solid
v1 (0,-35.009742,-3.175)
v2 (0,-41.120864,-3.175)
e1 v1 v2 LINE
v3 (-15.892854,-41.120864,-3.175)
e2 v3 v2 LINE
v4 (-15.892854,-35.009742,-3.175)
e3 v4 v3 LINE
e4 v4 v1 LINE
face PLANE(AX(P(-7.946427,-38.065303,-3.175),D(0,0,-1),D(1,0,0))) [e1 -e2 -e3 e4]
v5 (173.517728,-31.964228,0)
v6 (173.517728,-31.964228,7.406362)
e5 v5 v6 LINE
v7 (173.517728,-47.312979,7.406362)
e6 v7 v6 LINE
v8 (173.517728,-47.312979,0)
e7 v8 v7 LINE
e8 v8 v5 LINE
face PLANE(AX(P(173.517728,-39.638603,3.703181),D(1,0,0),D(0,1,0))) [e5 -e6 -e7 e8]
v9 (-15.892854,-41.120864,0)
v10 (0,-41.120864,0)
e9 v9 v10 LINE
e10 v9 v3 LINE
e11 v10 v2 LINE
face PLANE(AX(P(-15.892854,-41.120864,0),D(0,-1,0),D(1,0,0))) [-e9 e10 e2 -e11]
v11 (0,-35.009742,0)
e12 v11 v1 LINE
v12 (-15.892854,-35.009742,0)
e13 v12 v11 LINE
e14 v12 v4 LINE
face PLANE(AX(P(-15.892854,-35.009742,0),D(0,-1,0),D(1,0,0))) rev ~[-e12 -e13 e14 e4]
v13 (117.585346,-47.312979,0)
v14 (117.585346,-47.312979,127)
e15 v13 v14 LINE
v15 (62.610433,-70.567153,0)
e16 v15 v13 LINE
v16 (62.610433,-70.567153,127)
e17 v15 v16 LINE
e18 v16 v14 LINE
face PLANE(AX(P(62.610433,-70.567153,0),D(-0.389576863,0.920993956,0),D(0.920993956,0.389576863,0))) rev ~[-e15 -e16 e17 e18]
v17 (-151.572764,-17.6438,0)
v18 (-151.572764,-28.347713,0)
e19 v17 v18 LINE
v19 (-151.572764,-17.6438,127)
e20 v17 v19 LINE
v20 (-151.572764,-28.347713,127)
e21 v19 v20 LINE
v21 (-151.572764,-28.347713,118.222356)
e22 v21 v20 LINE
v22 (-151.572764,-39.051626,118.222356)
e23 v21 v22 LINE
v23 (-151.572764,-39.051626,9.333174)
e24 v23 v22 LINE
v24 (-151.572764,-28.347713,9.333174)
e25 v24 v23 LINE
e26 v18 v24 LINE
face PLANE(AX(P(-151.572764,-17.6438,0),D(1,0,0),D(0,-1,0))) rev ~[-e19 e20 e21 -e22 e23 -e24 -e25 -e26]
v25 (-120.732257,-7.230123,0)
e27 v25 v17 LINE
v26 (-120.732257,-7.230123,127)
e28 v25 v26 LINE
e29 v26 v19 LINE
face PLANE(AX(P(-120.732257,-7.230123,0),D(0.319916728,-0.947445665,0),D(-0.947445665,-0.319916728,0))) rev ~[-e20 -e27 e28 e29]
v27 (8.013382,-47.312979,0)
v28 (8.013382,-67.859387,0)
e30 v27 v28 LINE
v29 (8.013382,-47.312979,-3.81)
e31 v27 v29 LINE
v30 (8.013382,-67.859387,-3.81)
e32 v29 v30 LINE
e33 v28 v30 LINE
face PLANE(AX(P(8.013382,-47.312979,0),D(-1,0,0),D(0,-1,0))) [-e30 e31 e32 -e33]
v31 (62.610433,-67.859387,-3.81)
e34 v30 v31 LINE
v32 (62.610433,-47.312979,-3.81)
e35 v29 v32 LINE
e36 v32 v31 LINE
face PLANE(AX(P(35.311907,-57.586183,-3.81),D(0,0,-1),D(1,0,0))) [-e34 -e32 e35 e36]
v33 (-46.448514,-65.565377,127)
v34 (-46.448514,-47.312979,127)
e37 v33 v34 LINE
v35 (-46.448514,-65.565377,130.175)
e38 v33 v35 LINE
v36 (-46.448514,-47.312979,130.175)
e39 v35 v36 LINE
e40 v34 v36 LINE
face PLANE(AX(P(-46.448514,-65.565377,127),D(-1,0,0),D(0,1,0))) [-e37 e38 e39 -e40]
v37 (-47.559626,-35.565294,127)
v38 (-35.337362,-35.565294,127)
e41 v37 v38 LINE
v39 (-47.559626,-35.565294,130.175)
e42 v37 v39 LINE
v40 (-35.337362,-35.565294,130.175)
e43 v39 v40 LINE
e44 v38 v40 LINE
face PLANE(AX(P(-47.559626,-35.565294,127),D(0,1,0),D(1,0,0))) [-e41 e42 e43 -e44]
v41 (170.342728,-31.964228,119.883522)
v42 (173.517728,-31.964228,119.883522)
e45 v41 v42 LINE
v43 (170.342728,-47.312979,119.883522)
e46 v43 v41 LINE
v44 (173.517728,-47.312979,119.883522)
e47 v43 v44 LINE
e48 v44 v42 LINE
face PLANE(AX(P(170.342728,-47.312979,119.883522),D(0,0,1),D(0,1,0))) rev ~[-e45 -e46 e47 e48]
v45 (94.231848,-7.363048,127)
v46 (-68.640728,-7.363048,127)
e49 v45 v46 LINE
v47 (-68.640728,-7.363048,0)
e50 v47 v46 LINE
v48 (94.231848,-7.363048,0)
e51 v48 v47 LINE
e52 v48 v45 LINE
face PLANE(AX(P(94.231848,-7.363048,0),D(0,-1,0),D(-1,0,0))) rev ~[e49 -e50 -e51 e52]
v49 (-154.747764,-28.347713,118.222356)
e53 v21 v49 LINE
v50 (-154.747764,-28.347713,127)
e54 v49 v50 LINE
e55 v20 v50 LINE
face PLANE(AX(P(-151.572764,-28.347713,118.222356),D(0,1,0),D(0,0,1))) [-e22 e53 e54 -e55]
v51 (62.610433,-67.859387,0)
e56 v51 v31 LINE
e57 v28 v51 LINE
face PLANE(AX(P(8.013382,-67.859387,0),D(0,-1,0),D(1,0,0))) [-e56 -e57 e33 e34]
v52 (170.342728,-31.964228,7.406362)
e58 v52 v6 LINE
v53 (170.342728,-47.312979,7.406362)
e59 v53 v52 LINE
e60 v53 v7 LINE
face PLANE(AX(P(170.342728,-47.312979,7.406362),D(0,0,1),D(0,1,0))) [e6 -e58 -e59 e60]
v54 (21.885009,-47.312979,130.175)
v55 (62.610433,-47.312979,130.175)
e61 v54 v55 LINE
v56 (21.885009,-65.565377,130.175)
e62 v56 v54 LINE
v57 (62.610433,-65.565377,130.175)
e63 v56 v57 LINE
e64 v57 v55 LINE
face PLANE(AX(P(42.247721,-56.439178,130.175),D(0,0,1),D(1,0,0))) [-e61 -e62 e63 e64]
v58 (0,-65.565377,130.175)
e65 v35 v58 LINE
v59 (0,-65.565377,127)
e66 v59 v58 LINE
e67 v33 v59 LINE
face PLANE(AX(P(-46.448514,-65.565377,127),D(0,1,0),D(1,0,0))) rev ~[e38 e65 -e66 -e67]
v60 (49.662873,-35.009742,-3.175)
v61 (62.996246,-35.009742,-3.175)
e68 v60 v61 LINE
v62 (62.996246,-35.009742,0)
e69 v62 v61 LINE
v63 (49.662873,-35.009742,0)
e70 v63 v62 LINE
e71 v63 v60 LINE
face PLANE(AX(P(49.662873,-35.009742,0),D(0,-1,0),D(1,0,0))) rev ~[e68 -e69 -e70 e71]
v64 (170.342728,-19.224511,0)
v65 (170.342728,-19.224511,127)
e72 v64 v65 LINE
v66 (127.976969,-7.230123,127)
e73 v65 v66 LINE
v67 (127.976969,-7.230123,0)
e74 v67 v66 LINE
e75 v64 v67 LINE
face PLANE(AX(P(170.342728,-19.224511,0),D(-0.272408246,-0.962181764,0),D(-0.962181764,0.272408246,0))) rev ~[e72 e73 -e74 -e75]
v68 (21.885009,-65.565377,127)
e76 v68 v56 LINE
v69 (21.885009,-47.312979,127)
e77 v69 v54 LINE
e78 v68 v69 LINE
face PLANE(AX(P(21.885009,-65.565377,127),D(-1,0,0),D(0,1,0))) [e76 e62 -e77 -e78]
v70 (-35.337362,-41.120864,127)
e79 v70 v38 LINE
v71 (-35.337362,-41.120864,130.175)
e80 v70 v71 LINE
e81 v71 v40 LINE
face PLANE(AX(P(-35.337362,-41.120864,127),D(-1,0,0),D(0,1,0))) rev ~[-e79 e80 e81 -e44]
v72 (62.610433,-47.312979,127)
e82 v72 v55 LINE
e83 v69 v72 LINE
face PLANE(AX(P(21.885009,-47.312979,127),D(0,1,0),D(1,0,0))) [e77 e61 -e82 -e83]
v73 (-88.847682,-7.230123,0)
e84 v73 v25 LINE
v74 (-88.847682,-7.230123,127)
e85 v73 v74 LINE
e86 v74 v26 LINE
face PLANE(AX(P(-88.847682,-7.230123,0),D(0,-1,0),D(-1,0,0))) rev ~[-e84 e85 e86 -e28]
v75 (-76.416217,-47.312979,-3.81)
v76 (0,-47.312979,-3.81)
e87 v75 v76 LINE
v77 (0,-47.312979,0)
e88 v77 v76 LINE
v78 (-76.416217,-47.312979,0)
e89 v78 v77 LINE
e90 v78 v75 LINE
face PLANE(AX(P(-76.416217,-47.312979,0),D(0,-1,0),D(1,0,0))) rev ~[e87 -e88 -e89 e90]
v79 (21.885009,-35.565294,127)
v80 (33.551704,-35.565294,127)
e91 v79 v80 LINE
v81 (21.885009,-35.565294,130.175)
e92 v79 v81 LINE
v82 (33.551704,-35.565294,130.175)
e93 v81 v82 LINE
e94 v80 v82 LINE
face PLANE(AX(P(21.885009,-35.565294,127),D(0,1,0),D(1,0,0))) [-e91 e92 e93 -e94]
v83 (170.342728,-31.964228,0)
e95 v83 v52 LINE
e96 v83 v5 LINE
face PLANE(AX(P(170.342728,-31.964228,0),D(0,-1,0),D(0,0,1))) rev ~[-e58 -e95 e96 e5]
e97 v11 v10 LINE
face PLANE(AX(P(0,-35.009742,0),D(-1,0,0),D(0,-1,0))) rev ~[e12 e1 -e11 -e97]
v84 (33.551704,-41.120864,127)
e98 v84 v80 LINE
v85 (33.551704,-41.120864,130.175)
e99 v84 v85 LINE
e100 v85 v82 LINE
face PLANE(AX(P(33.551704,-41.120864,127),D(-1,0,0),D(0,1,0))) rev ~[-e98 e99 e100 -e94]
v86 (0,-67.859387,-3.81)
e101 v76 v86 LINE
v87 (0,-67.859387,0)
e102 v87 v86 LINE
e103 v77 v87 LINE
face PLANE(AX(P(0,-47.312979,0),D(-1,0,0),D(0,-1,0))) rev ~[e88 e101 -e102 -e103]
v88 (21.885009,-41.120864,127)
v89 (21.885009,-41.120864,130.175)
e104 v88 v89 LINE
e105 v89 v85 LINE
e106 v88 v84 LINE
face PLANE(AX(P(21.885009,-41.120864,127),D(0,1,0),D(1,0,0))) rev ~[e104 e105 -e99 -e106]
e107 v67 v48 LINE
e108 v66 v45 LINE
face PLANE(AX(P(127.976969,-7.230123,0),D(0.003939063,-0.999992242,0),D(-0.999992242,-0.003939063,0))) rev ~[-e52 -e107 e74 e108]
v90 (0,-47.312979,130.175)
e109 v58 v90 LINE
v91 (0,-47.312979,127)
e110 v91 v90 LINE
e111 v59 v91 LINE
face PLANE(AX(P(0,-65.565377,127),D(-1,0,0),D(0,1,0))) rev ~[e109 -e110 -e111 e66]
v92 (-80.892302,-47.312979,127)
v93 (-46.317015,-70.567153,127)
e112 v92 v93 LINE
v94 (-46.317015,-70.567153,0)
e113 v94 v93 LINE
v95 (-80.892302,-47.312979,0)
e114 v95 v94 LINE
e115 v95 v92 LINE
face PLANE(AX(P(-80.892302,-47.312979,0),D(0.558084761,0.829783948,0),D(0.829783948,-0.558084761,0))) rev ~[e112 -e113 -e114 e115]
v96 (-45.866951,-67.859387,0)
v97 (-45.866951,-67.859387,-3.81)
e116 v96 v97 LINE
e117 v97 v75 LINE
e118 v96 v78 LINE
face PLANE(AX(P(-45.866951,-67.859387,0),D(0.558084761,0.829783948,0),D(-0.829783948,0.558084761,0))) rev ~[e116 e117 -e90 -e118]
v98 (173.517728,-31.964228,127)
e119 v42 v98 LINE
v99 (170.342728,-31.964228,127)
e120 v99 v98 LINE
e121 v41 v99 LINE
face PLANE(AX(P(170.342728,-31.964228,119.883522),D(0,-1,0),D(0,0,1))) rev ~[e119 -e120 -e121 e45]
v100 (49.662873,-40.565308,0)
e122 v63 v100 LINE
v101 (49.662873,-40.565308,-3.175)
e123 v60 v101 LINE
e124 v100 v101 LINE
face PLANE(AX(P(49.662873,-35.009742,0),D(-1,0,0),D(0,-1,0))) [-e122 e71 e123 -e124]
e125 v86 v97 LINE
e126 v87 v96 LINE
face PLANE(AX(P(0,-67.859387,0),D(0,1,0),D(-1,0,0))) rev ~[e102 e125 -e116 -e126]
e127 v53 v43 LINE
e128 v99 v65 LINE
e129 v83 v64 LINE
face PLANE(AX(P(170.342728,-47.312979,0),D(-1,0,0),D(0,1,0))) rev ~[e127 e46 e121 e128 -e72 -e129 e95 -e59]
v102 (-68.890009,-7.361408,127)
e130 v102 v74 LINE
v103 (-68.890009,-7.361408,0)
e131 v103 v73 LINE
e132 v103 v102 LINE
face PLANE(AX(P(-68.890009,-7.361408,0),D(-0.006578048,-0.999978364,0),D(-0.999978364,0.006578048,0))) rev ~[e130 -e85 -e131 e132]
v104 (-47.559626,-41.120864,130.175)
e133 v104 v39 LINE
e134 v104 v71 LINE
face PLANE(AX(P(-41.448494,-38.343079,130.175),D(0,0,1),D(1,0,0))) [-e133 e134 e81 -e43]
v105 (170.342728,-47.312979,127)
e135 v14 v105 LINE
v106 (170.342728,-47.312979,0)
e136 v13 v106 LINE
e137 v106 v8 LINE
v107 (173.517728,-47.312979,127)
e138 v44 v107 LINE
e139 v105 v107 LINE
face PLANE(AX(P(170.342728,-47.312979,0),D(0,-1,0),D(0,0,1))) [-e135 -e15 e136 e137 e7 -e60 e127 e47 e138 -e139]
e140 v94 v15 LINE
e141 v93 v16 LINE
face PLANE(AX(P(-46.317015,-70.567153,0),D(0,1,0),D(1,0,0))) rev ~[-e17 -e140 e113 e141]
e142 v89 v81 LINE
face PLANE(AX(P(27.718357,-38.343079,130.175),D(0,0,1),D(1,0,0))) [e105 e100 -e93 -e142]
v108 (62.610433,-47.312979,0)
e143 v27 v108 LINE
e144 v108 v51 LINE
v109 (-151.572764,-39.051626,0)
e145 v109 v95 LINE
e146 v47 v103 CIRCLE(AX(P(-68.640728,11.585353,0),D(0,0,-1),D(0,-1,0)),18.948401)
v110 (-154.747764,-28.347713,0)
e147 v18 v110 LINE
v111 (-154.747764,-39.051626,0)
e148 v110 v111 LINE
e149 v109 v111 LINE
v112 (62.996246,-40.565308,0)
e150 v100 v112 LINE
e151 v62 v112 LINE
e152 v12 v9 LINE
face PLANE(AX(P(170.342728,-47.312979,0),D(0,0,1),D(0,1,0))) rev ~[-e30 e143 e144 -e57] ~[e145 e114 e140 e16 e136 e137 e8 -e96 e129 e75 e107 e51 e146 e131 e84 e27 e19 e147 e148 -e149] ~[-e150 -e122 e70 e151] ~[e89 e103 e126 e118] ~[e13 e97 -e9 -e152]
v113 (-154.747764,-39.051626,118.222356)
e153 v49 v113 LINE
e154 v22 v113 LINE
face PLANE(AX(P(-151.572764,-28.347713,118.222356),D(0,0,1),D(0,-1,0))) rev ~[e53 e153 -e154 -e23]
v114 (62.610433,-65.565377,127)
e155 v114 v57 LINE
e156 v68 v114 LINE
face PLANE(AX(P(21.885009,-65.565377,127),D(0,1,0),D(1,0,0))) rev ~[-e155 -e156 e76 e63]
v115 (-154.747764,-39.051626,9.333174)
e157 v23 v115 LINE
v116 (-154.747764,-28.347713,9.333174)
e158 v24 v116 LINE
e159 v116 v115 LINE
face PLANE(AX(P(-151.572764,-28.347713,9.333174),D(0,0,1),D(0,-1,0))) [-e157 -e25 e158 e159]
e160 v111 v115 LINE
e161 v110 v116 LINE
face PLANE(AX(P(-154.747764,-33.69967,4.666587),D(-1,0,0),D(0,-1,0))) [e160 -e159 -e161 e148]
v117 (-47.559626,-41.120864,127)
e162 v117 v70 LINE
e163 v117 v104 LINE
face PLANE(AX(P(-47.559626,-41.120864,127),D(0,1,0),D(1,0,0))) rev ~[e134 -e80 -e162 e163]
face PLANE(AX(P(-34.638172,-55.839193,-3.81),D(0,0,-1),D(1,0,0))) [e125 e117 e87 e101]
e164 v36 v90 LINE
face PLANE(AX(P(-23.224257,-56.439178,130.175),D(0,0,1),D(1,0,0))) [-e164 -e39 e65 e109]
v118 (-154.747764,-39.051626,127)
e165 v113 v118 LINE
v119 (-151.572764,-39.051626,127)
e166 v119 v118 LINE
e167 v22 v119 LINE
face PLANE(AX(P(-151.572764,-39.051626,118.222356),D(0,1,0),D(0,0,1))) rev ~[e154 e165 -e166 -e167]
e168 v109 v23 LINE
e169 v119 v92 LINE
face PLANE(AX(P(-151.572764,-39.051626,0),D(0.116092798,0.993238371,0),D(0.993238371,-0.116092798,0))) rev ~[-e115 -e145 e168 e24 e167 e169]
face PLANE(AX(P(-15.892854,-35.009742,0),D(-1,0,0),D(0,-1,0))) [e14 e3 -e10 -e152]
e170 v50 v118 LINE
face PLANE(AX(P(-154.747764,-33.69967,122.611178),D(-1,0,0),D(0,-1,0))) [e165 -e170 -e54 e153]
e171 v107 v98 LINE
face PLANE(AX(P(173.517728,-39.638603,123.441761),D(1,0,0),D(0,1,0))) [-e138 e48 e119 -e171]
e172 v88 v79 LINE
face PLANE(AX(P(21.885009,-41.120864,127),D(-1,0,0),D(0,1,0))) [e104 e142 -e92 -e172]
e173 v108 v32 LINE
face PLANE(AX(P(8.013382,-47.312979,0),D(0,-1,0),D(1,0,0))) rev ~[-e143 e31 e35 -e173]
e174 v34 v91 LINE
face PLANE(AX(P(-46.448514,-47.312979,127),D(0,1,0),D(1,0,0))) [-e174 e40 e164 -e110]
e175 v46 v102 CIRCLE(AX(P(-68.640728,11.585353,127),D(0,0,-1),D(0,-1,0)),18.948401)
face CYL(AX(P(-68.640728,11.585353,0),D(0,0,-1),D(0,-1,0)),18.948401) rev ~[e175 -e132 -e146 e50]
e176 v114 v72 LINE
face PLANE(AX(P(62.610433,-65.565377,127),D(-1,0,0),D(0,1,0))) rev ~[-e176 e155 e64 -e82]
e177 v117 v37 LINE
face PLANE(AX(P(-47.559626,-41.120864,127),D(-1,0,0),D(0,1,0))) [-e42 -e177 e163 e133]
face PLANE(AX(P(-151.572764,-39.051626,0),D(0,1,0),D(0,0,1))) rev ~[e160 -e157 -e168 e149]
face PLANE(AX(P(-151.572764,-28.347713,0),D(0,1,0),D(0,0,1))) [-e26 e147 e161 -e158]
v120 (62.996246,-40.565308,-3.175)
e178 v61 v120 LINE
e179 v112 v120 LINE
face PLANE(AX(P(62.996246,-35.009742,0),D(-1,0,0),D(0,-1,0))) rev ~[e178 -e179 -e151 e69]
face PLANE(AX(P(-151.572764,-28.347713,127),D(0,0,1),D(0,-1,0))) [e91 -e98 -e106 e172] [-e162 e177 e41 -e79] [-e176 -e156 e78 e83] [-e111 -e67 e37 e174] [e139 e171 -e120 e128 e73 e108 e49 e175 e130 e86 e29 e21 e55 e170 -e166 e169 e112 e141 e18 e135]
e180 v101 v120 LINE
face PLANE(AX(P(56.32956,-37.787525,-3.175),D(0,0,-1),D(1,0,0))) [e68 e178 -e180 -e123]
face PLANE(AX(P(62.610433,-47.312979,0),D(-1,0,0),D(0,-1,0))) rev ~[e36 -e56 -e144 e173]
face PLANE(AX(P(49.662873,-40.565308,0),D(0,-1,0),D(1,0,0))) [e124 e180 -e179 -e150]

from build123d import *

# Parameters (mm, degrees)
F5_DEPTH  = 127
F6_W      = 54.5970508829
F6_H      = 20.5464081178
F7_DEPTH  = 3.81
F8_W      = 15.3487510979
F8_H      = 7.4063618667
F8_H_2    = 7.1164776087
F9_DEPTH  = 3.175
F10_W     = 10.7039126975
F10_H     = 8.7776441574
F10_H_2   = 9.3331737444
F11_DEPTH = 3.175
F12_W     = 40.7254230231
F12_H     = 18.2523988187
F12_W_2   = 46.4485138655
F13_DEPTH = 3.175
F14_W     = 15.8928539604
F14_H     = 6.1111226678
F14_W_2   = 13.3333727717
F14_H_2   = 5.5555664003
F15_DEPTH = 3.175
F16_W     = 11.666694656
F16_H     = 5.5555701256
F16_W_2   = 12.222263962
F17_DEPTH = 3.175


# Not quite as in the source:
# - the program builds the solid bodies; features that only make, move or delete a surface that nothing else refers to are left out


with BuildPart() as f5:
    # F0 (on Top) → F5 (new body)
    with BuildSketch(Plane.XY):
        with BuildLine():
            Line((94.2318475405, -7.3630477542), (-68.6407278484, -7.3630477542))
            ThreePointArc((-68.6407278484, -7.3630477542), (-68.7653713247, -7.3626377944), (-68.8900094076, -7.3614079328))
            Line((-68.8900094076, -7.3614079328), (-88.84768188, -7.2301225737))
            Line((-88.84768188, -7.2301225737), (-120.7322572041, -7.2301225737))
            Line((-120.7322572041, -7.2301225737), (-151.5727639198, -17.6438004827))
            Line((-151.5727639198, -17.6438004827), (-151.5727639198, -39.0516258776))
            Line((-151.5727639198, -39.0516258776), (-80.8923020959, -47.3129786551))
            Line((-80.8923020959, -47.3129786551), (-46.3170148432, -70.5671533942))
            Line((-46.3170148432, -70.5671533942), (62.6104325056, -70.5671533942))
            Line((62.6104325056, -70.5671533942), (117.5853461027, -47.3129786551))
            Line((117.5853461027, -47.3129786551), (170.3427284956, -47.3129786551))
            Line((170.3427284956, -47.3129786551), (170.3427284956, -19.2245114595))
            Line((170.3427284956, -19.2245114595), (127.9769688845, -7.2301225737))
            Line((127.9769688845, -7.2301225737), (94.2318475405, -7.3630477542))
        make_face()
    extrude(amount=F5_DEPTH)

    # F6 (on face) → F7 (join)
    with BuildSketch(Plane(origin=(0, 0, 0), x_dir=(1, 0, 0), z_dir=(0, 0, -1))):
        Polygon((-45.8669510931, 67.8593867729), (-76.4162167907, 47.3129786551), (0, 47.3129786551), (0, 67.8593867729), align=None)
        with Locations((35.3119070642, 57.586182714)):
            Rectangle(F6_W, F6_H)
    extrude(amount=F7_DEPTH)

    # F8 (on face) → F9 (join)
    with BuildSketch(Plane.YZ.offset(170.3427284956)):
        with Locations((-39.6386031061, 3.7031809334)):
            Rectangle(F8_W, F8_H)
        with Locations((-39.6386031061, 123.4417611957)):
            Rectangle(F8_W, F8_H_2)
    extrude(amount=F9_DEPTH)

    # F10 (on face) → F11 (join)
    with BuildSketch(Plane(origin=(-151.5727639198, 0, 0), x_dir=(0, -1, 0), z_dir=(-1, 0, 0))):
        with Locations((33.6996695289, 122.6111779213)):
            Rectangle(F10_W, F10_H)
        with Locations((33.6996695289, 4.6665868722)):
            Rectangle(F10_W, F10_H_2)
    extrude(amount=F11_DEPTH)

    # F12 (on face) → F13 (join)
    with BuildSketch(Plane.XY.offset(127)):
        with Locations((42.2477209941, -56.4391780645)):
            Rectangle(F12_W, F12_H)
        with Locations((-23.2242569327, -56.4391780645)):
            Rectangle(F12_W_2, F12_H)
    extrude(amount=F13_DEPTH)

    # F14 (on face) → F15 (join)
    with BuildSketch(Plane(origin=(0, 0, 0), x_dir=(1, 0, 0), z_dir=(0, 0, -1))):
        with Locations((-7.9464269802, 38.065303117)):
            Rectangle(F14_W, F14_H)
        with Locations((56.3295595348, 37.7875249833)):
            Rectangle(F14_W_2, F14_H_2)
    extrude(amount=F15_DEPTH)

    # F16 (on face) → F17 (join)
    with BuildSketch(Plane.XY.offset(127)):
        with Locations((27.7183568105, -38.3430793881)):
            Rectangle(F16_W, F16_H)
        with Locations((-41.4484944195, -38.3430793881)):
            Rectangle(F16_W_2, F16_H)
    extrude(amount=F17_DEPTH)


solid = f5.part
